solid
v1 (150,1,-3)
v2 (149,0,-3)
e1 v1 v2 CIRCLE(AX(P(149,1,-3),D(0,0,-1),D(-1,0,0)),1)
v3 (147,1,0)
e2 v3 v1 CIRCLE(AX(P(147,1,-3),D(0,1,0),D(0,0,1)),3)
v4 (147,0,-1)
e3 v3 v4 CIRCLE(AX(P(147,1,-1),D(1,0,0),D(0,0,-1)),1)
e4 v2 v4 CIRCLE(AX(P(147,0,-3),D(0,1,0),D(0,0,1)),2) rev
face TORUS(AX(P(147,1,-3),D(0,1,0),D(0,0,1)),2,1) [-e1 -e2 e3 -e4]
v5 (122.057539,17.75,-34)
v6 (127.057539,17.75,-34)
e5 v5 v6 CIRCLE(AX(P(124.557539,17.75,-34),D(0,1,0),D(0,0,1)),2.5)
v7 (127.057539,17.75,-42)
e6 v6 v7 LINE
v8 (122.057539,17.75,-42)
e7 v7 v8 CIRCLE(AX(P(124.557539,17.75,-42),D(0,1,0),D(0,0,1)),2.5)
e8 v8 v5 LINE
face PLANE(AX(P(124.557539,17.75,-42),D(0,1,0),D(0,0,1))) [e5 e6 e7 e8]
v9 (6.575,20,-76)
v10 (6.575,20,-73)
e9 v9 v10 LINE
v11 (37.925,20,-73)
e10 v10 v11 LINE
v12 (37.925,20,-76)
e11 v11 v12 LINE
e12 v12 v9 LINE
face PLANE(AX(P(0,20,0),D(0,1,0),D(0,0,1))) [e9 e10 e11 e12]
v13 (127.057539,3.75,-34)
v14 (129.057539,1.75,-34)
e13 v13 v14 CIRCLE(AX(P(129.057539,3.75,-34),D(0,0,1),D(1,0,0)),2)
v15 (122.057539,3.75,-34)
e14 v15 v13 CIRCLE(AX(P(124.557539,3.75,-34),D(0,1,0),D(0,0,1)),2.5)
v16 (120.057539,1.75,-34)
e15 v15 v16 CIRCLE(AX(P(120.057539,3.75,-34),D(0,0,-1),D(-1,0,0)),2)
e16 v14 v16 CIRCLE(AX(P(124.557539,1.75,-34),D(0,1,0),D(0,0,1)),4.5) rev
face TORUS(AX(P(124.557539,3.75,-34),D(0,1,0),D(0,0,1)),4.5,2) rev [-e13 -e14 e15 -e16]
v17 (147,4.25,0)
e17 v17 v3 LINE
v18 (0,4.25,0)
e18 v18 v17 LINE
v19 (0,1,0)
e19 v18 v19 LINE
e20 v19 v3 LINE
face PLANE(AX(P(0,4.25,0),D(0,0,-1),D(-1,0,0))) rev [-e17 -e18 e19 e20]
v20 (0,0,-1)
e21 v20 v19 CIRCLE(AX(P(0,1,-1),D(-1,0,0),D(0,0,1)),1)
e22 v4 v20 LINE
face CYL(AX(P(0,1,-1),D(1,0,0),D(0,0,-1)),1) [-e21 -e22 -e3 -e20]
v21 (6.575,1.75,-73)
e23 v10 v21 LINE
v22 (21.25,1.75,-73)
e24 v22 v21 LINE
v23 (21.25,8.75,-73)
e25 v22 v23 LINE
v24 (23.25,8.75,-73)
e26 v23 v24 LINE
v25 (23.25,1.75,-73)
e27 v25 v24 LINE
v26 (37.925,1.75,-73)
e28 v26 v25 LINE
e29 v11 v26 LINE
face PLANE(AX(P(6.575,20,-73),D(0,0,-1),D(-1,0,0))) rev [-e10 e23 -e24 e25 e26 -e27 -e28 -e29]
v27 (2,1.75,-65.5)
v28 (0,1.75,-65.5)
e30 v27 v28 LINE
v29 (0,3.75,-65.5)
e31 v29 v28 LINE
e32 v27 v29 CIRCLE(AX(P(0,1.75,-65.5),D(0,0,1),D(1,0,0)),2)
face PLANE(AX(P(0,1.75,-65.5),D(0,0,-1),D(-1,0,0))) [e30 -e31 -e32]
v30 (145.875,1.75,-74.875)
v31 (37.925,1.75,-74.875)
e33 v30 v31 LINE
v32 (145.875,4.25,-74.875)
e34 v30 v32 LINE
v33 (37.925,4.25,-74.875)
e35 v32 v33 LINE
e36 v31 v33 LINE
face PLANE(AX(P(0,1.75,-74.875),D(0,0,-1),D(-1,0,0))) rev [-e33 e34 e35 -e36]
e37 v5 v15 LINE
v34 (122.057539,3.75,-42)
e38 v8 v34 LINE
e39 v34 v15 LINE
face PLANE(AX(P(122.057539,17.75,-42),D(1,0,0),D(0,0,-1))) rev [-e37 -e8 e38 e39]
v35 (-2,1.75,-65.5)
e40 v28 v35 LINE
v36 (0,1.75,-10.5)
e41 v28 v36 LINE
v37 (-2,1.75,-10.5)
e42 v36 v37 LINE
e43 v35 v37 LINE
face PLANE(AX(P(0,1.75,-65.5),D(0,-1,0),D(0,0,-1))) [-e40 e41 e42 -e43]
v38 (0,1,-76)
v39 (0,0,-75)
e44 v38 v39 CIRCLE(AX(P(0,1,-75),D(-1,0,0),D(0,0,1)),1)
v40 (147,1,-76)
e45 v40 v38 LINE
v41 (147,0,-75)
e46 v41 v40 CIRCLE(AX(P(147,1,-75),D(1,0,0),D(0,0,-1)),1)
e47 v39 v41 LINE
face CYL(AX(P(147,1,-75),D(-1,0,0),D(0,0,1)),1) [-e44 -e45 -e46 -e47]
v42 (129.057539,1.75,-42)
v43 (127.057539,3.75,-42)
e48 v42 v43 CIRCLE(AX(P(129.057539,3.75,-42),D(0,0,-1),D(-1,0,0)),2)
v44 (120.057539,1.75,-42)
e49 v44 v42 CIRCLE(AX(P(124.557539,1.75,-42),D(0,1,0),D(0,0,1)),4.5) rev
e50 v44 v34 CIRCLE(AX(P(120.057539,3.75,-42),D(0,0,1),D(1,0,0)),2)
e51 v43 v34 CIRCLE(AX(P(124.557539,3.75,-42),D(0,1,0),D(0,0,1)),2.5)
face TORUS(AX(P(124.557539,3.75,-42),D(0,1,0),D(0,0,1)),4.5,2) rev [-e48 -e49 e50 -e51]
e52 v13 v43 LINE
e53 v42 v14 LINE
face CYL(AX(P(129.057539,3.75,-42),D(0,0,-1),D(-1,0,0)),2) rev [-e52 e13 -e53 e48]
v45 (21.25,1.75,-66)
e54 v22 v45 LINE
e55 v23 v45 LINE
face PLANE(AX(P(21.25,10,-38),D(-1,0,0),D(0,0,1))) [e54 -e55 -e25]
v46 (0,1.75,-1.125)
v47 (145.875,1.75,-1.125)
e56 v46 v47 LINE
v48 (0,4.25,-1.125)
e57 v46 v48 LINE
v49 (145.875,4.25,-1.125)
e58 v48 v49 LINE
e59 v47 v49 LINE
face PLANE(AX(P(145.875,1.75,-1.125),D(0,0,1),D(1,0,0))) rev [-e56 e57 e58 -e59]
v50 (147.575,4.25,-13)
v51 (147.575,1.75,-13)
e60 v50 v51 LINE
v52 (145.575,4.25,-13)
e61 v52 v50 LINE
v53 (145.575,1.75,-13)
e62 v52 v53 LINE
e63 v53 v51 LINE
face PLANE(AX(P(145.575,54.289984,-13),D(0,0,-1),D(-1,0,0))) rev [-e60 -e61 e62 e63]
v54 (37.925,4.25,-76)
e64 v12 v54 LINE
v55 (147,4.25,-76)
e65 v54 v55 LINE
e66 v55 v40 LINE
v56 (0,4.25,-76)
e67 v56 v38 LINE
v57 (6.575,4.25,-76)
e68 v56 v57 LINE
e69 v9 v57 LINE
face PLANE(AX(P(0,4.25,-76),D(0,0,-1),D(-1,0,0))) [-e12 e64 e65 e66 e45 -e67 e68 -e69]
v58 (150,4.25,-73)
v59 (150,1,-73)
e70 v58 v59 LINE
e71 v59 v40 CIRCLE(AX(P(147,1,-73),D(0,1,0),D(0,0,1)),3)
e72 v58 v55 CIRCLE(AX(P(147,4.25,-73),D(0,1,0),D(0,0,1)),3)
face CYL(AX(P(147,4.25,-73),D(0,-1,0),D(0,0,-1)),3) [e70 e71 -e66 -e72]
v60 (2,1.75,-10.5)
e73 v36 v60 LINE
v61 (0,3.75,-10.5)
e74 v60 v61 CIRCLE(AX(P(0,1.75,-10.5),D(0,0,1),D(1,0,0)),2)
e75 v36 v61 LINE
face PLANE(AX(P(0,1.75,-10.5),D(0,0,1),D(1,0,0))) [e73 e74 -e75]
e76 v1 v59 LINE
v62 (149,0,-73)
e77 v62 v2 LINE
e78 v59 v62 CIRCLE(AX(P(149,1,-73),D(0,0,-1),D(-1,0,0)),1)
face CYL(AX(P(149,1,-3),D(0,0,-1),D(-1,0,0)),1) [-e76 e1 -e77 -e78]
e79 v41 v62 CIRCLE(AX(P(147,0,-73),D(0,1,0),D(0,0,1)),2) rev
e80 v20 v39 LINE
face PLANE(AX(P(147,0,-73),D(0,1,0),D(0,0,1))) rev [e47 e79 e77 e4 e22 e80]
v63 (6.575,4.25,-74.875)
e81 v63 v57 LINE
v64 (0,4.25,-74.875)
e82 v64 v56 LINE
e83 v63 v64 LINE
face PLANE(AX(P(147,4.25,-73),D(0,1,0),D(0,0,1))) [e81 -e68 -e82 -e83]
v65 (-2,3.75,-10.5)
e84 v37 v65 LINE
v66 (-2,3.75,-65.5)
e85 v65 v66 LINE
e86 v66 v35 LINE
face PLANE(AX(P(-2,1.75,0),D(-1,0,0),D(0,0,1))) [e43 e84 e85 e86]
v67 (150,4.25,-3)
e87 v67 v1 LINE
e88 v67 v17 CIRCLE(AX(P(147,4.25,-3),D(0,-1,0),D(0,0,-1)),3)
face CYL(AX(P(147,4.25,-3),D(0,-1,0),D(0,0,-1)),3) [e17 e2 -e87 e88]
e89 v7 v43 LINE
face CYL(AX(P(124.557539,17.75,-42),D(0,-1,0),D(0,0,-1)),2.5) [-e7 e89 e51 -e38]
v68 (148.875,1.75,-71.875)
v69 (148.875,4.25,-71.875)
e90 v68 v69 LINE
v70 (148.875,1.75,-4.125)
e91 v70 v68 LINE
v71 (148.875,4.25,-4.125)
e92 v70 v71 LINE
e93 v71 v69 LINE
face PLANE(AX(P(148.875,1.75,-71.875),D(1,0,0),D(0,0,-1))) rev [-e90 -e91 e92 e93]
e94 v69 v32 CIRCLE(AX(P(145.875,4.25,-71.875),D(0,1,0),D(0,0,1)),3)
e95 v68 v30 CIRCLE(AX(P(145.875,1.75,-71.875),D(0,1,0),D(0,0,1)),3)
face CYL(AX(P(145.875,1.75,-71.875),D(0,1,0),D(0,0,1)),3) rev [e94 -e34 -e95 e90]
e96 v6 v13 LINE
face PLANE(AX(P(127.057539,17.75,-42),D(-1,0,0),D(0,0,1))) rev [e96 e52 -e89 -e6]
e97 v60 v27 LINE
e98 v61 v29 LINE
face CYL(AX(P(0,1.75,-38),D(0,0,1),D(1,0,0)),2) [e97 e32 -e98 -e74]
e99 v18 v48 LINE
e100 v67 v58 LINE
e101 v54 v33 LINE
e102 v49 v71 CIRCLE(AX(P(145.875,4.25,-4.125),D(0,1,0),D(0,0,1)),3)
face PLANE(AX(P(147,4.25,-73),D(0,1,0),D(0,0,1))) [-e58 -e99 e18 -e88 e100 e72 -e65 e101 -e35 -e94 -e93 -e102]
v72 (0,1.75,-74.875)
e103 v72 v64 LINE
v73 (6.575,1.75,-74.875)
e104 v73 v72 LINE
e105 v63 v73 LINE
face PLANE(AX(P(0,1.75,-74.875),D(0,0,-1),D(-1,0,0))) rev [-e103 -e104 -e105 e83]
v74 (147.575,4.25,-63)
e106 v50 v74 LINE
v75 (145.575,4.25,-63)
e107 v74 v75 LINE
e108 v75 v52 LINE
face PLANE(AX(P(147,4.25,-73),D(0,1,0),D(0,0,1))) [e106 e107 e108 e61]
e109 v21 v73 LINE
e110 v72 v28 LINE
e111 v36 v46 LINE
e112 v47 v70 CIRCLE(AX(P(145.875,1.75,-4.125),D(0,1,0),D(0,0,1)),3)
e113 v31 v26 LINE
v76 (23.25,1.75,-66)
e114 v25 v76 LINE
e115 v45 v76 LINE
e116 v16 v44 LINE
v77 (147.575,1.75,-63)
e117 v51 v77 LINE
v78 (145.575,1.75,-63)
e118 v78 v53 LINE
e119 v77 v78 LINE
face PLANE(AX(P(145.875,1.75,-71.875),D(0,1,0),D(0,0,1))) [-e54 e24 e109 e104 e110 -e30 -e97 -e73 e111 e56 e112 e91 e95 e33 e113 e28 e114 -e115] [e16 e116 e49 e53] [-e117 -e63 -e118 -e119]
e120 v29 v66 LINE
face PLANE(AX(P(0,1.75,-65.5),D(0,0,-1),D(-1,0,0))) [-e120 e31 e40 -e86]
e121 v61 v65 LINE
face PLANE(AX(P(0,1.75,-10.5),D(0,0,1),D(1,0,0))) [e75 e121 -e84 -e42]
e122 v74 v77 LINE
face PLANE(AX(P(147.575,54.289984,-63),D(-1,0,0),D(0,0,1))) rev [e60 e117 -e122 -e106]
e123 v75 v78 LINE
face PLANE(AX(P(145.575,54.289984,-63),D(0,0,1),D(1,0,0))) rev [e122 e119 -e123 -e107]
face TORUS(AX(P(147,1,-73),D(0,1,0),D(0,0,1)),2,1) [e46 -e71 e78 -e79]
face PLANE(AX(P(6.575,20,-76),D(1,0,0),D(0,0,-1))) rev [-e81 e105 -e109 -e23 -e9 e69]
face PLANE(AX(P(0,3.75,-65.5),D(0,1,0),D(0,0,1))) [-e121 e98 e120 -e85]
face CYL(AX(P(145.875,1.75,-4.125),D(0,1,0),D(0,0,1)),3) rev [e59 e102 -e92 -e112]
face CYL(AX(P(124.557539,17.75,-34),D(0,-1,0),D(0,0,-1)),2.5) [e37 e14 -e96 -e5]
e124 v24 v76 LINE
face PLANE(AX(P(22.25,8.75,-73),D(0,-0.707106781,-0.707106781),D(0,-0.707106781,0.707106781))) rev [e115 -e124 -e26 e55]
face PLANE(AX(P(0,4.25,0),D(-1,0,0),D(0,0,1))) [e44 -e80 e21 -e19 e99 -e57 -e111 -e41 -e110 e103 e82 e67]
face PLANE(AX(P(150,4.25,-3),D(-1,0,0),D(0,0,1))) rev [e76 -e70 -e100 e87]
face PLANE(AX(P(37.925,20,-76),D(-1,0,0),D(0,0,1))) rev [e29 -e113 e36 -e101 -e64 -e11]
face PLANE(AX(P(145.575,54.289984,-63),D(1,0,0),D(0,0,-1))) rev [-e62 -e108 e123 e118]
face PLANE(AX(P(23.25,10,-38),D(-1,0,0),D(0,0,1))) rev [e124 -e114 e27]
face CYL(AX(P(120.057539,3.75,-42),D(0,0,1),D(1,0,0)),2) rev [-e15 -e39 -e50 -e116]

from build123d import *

# Parameters (mm, degrees)
BOSS_EXTRUDE1_DEPTH = 4.25
CUT_EXTRUDE1_DEPTH  = 2.5
SKETCH3_W           = 31.35
SKETCH3_H           = 3
BOSS_EXTRUDE2_DEPTH = 20
FILLET1_R           = 1
SWEEP1_START        = -65.5
SWEEP1_DEPTH        = 55
SKETCH6_W           = 2
SKETCH6_H           = 50
BOSS_EXTRUDE3_DEPTH = 2.5
RIB1_REACH          = 151.987
SKETCH7_WALL_W      = 311.873243788
SKETCH7_WALL_H      = 2
BOSS_EXTRUDE4_DEPTH = 16
FILLET2_R           = 2


# Read off the part's stored shape, not the designer's step: Sweep1
with BuildPart() as part:
    # Sketch1 → Boss-Extrude1 (new body)
    with BuildSketch(Plane(origin=(0, 0, 0), x_dir=(1, 0, 0), z_dir=(0, 1, 0))):
        with BuildLine():
            Line((0, 0), (147, 0))
            ThreePointArc((147, 0), (149.121320344, 0.878679656), (150, 3))
            Line((150, 3), (150, 73))
            ThreePointArc((150, 73), (149.121320344, 75.121320344), (147, 76))
            Line((147, 76), (0, 76))
            Line((0, 76), (0, 0))
        make_face()
    extrude(amount=BOSS_EXTRUDE1_DEPTH)

    # Sketch2 → Cut-Extrude1 (cut)
    with BuildSketch(Plane(origin=(0, 4.25, 0), x_dir=(1, 0, 0), z_dir=(0, 1, 0))):
        with BuildLine():
            Line((0, 74.875), (145.875, 74.875))
            ThreePointArc((145.875, 74.875), (147.996320344, 73.996320344), (148.875, 71.875))
            Line((148.875, 71.875), (148.875, 4.125))
            ThreePointArc((148.875, 4.125), (147.996320344, 2.003679656), (145.875, 1.125))
            Line((145.875, 1.125), (0, 1.125))
            Line((0, 1.125), (0, 74.875))
        make_face()
    extrude(amount=-CUT_EXTRUDE1_DEPTH, mode=Mode.SUBTRACT)

    # Sketch3 → Boss-Extrude2 (add)
    with BuildSketch(Plane(origin=(0, 0, 0), x_dir=(1, 0, 0), z_dir=(0, 1, 0))):
        with Locations((22.25, 74.5)):
            Rectangle(SKETCH3_W, SKETCH3_H)
    extrude(amount=BOSS_EXTRUDE2_DEPTH)

    # Fillet1
    fillet1_edges = [part.edges().sort_by_distance(p)[0] for p in [
        (73.5, 0, 0),
        (149.121320344, 0, -0.878679656),
        (150, 0, -38),
        (149.121320344, 0, -75.121320344),
        (73.5, 0, -76),
    ]]
    fillet(fillet1_edges, radius=FILLET1_R)

    # Sweep1 outline → Sweep1 (add)
    with BuildSketch(Plane.XY.offset(SWEEP1_START)):
        with BuildLine():
            Line((0, 3.75), (-2, 3.75))
            Line((-2, 3.75), (-2, 1.75))
            Line((-2, 1.75), (2, 1.75))
            ThreePointArc((2, 1.75), (1.414213562, 3.164213562), (0, 3.75))
        make_face()
    extrude(amount=SWEEP1_DEPTH)

    # Sketch6 → Boss-Extrude3 (add)
    with BuildSketch(Plane(origin=(0, 1.75, 0), x_dir=(1, 0, 0), z_dir=(0, 1, 0))):
        with Locations((146.575, 38)):
            Rectangle(SKETCH6_W, SKETCH6_H)
    extrude(amount=BOSS_EXTRUDE3_DEPTH)

    # Sketch7 wall → Rib1 (add, up to next)
    with BuildSketch(Plane(origin=(22.25, 5.25, -69.5), x_dir=(0, -0.707106781187, 0.707106781187), z_dir=(0, 0.707106781187, 0.707106781187)), mode=Mode.PRIVATE) as rib1_sk1:
        Rectangle(SKETCH7_WALL_W, SKETCH7_WALL_H)
    rib1_tool1 = extrude(rib1_sk1.sketch, amount=-RIB1_REACH, mode=Mode.PRIVATE) - part.part
    add(rib1_tool1.solids().sort_by_distance((22.25, 5.25, -69.5))[0])

    # Sketch8 → Boss-Extrude4 (add)
    with BuildSketch(Plane(origin=(0, 1.75, 0), x_dir=(1, 0, 0), z_dir=(0, 1, 0))):
        with BuildLine():
            Line((127.05753899, 42), (127.05753899, 34))
            ThreePointArc((127.05753899, 34), (124.55753899, 31.5), (122.05753899, 34))
            Line((122.05753899, 34), (122.05753899, 42))
            ThreePointArc((122.05753899, 42), (124.55753899, 44.5), (127.05753899, 42))
        make_face()
    extrude(amount=BOSS_EXTRUDE4_DEPTH)

    # Fillet2
    fillet2_edges = [part.edges().sort_by_distance(p)[0] for p in [
        (124.55753899, 1.75, -44.5),
        (122.05753899, 1.75, -38),
        (124.55753899, 1.75, -31.5),
        (127.05753899, 1.75, -38),
    ]]
    fillet(fillet2_edges, radius=FILLET2_R)


solid = part.part
